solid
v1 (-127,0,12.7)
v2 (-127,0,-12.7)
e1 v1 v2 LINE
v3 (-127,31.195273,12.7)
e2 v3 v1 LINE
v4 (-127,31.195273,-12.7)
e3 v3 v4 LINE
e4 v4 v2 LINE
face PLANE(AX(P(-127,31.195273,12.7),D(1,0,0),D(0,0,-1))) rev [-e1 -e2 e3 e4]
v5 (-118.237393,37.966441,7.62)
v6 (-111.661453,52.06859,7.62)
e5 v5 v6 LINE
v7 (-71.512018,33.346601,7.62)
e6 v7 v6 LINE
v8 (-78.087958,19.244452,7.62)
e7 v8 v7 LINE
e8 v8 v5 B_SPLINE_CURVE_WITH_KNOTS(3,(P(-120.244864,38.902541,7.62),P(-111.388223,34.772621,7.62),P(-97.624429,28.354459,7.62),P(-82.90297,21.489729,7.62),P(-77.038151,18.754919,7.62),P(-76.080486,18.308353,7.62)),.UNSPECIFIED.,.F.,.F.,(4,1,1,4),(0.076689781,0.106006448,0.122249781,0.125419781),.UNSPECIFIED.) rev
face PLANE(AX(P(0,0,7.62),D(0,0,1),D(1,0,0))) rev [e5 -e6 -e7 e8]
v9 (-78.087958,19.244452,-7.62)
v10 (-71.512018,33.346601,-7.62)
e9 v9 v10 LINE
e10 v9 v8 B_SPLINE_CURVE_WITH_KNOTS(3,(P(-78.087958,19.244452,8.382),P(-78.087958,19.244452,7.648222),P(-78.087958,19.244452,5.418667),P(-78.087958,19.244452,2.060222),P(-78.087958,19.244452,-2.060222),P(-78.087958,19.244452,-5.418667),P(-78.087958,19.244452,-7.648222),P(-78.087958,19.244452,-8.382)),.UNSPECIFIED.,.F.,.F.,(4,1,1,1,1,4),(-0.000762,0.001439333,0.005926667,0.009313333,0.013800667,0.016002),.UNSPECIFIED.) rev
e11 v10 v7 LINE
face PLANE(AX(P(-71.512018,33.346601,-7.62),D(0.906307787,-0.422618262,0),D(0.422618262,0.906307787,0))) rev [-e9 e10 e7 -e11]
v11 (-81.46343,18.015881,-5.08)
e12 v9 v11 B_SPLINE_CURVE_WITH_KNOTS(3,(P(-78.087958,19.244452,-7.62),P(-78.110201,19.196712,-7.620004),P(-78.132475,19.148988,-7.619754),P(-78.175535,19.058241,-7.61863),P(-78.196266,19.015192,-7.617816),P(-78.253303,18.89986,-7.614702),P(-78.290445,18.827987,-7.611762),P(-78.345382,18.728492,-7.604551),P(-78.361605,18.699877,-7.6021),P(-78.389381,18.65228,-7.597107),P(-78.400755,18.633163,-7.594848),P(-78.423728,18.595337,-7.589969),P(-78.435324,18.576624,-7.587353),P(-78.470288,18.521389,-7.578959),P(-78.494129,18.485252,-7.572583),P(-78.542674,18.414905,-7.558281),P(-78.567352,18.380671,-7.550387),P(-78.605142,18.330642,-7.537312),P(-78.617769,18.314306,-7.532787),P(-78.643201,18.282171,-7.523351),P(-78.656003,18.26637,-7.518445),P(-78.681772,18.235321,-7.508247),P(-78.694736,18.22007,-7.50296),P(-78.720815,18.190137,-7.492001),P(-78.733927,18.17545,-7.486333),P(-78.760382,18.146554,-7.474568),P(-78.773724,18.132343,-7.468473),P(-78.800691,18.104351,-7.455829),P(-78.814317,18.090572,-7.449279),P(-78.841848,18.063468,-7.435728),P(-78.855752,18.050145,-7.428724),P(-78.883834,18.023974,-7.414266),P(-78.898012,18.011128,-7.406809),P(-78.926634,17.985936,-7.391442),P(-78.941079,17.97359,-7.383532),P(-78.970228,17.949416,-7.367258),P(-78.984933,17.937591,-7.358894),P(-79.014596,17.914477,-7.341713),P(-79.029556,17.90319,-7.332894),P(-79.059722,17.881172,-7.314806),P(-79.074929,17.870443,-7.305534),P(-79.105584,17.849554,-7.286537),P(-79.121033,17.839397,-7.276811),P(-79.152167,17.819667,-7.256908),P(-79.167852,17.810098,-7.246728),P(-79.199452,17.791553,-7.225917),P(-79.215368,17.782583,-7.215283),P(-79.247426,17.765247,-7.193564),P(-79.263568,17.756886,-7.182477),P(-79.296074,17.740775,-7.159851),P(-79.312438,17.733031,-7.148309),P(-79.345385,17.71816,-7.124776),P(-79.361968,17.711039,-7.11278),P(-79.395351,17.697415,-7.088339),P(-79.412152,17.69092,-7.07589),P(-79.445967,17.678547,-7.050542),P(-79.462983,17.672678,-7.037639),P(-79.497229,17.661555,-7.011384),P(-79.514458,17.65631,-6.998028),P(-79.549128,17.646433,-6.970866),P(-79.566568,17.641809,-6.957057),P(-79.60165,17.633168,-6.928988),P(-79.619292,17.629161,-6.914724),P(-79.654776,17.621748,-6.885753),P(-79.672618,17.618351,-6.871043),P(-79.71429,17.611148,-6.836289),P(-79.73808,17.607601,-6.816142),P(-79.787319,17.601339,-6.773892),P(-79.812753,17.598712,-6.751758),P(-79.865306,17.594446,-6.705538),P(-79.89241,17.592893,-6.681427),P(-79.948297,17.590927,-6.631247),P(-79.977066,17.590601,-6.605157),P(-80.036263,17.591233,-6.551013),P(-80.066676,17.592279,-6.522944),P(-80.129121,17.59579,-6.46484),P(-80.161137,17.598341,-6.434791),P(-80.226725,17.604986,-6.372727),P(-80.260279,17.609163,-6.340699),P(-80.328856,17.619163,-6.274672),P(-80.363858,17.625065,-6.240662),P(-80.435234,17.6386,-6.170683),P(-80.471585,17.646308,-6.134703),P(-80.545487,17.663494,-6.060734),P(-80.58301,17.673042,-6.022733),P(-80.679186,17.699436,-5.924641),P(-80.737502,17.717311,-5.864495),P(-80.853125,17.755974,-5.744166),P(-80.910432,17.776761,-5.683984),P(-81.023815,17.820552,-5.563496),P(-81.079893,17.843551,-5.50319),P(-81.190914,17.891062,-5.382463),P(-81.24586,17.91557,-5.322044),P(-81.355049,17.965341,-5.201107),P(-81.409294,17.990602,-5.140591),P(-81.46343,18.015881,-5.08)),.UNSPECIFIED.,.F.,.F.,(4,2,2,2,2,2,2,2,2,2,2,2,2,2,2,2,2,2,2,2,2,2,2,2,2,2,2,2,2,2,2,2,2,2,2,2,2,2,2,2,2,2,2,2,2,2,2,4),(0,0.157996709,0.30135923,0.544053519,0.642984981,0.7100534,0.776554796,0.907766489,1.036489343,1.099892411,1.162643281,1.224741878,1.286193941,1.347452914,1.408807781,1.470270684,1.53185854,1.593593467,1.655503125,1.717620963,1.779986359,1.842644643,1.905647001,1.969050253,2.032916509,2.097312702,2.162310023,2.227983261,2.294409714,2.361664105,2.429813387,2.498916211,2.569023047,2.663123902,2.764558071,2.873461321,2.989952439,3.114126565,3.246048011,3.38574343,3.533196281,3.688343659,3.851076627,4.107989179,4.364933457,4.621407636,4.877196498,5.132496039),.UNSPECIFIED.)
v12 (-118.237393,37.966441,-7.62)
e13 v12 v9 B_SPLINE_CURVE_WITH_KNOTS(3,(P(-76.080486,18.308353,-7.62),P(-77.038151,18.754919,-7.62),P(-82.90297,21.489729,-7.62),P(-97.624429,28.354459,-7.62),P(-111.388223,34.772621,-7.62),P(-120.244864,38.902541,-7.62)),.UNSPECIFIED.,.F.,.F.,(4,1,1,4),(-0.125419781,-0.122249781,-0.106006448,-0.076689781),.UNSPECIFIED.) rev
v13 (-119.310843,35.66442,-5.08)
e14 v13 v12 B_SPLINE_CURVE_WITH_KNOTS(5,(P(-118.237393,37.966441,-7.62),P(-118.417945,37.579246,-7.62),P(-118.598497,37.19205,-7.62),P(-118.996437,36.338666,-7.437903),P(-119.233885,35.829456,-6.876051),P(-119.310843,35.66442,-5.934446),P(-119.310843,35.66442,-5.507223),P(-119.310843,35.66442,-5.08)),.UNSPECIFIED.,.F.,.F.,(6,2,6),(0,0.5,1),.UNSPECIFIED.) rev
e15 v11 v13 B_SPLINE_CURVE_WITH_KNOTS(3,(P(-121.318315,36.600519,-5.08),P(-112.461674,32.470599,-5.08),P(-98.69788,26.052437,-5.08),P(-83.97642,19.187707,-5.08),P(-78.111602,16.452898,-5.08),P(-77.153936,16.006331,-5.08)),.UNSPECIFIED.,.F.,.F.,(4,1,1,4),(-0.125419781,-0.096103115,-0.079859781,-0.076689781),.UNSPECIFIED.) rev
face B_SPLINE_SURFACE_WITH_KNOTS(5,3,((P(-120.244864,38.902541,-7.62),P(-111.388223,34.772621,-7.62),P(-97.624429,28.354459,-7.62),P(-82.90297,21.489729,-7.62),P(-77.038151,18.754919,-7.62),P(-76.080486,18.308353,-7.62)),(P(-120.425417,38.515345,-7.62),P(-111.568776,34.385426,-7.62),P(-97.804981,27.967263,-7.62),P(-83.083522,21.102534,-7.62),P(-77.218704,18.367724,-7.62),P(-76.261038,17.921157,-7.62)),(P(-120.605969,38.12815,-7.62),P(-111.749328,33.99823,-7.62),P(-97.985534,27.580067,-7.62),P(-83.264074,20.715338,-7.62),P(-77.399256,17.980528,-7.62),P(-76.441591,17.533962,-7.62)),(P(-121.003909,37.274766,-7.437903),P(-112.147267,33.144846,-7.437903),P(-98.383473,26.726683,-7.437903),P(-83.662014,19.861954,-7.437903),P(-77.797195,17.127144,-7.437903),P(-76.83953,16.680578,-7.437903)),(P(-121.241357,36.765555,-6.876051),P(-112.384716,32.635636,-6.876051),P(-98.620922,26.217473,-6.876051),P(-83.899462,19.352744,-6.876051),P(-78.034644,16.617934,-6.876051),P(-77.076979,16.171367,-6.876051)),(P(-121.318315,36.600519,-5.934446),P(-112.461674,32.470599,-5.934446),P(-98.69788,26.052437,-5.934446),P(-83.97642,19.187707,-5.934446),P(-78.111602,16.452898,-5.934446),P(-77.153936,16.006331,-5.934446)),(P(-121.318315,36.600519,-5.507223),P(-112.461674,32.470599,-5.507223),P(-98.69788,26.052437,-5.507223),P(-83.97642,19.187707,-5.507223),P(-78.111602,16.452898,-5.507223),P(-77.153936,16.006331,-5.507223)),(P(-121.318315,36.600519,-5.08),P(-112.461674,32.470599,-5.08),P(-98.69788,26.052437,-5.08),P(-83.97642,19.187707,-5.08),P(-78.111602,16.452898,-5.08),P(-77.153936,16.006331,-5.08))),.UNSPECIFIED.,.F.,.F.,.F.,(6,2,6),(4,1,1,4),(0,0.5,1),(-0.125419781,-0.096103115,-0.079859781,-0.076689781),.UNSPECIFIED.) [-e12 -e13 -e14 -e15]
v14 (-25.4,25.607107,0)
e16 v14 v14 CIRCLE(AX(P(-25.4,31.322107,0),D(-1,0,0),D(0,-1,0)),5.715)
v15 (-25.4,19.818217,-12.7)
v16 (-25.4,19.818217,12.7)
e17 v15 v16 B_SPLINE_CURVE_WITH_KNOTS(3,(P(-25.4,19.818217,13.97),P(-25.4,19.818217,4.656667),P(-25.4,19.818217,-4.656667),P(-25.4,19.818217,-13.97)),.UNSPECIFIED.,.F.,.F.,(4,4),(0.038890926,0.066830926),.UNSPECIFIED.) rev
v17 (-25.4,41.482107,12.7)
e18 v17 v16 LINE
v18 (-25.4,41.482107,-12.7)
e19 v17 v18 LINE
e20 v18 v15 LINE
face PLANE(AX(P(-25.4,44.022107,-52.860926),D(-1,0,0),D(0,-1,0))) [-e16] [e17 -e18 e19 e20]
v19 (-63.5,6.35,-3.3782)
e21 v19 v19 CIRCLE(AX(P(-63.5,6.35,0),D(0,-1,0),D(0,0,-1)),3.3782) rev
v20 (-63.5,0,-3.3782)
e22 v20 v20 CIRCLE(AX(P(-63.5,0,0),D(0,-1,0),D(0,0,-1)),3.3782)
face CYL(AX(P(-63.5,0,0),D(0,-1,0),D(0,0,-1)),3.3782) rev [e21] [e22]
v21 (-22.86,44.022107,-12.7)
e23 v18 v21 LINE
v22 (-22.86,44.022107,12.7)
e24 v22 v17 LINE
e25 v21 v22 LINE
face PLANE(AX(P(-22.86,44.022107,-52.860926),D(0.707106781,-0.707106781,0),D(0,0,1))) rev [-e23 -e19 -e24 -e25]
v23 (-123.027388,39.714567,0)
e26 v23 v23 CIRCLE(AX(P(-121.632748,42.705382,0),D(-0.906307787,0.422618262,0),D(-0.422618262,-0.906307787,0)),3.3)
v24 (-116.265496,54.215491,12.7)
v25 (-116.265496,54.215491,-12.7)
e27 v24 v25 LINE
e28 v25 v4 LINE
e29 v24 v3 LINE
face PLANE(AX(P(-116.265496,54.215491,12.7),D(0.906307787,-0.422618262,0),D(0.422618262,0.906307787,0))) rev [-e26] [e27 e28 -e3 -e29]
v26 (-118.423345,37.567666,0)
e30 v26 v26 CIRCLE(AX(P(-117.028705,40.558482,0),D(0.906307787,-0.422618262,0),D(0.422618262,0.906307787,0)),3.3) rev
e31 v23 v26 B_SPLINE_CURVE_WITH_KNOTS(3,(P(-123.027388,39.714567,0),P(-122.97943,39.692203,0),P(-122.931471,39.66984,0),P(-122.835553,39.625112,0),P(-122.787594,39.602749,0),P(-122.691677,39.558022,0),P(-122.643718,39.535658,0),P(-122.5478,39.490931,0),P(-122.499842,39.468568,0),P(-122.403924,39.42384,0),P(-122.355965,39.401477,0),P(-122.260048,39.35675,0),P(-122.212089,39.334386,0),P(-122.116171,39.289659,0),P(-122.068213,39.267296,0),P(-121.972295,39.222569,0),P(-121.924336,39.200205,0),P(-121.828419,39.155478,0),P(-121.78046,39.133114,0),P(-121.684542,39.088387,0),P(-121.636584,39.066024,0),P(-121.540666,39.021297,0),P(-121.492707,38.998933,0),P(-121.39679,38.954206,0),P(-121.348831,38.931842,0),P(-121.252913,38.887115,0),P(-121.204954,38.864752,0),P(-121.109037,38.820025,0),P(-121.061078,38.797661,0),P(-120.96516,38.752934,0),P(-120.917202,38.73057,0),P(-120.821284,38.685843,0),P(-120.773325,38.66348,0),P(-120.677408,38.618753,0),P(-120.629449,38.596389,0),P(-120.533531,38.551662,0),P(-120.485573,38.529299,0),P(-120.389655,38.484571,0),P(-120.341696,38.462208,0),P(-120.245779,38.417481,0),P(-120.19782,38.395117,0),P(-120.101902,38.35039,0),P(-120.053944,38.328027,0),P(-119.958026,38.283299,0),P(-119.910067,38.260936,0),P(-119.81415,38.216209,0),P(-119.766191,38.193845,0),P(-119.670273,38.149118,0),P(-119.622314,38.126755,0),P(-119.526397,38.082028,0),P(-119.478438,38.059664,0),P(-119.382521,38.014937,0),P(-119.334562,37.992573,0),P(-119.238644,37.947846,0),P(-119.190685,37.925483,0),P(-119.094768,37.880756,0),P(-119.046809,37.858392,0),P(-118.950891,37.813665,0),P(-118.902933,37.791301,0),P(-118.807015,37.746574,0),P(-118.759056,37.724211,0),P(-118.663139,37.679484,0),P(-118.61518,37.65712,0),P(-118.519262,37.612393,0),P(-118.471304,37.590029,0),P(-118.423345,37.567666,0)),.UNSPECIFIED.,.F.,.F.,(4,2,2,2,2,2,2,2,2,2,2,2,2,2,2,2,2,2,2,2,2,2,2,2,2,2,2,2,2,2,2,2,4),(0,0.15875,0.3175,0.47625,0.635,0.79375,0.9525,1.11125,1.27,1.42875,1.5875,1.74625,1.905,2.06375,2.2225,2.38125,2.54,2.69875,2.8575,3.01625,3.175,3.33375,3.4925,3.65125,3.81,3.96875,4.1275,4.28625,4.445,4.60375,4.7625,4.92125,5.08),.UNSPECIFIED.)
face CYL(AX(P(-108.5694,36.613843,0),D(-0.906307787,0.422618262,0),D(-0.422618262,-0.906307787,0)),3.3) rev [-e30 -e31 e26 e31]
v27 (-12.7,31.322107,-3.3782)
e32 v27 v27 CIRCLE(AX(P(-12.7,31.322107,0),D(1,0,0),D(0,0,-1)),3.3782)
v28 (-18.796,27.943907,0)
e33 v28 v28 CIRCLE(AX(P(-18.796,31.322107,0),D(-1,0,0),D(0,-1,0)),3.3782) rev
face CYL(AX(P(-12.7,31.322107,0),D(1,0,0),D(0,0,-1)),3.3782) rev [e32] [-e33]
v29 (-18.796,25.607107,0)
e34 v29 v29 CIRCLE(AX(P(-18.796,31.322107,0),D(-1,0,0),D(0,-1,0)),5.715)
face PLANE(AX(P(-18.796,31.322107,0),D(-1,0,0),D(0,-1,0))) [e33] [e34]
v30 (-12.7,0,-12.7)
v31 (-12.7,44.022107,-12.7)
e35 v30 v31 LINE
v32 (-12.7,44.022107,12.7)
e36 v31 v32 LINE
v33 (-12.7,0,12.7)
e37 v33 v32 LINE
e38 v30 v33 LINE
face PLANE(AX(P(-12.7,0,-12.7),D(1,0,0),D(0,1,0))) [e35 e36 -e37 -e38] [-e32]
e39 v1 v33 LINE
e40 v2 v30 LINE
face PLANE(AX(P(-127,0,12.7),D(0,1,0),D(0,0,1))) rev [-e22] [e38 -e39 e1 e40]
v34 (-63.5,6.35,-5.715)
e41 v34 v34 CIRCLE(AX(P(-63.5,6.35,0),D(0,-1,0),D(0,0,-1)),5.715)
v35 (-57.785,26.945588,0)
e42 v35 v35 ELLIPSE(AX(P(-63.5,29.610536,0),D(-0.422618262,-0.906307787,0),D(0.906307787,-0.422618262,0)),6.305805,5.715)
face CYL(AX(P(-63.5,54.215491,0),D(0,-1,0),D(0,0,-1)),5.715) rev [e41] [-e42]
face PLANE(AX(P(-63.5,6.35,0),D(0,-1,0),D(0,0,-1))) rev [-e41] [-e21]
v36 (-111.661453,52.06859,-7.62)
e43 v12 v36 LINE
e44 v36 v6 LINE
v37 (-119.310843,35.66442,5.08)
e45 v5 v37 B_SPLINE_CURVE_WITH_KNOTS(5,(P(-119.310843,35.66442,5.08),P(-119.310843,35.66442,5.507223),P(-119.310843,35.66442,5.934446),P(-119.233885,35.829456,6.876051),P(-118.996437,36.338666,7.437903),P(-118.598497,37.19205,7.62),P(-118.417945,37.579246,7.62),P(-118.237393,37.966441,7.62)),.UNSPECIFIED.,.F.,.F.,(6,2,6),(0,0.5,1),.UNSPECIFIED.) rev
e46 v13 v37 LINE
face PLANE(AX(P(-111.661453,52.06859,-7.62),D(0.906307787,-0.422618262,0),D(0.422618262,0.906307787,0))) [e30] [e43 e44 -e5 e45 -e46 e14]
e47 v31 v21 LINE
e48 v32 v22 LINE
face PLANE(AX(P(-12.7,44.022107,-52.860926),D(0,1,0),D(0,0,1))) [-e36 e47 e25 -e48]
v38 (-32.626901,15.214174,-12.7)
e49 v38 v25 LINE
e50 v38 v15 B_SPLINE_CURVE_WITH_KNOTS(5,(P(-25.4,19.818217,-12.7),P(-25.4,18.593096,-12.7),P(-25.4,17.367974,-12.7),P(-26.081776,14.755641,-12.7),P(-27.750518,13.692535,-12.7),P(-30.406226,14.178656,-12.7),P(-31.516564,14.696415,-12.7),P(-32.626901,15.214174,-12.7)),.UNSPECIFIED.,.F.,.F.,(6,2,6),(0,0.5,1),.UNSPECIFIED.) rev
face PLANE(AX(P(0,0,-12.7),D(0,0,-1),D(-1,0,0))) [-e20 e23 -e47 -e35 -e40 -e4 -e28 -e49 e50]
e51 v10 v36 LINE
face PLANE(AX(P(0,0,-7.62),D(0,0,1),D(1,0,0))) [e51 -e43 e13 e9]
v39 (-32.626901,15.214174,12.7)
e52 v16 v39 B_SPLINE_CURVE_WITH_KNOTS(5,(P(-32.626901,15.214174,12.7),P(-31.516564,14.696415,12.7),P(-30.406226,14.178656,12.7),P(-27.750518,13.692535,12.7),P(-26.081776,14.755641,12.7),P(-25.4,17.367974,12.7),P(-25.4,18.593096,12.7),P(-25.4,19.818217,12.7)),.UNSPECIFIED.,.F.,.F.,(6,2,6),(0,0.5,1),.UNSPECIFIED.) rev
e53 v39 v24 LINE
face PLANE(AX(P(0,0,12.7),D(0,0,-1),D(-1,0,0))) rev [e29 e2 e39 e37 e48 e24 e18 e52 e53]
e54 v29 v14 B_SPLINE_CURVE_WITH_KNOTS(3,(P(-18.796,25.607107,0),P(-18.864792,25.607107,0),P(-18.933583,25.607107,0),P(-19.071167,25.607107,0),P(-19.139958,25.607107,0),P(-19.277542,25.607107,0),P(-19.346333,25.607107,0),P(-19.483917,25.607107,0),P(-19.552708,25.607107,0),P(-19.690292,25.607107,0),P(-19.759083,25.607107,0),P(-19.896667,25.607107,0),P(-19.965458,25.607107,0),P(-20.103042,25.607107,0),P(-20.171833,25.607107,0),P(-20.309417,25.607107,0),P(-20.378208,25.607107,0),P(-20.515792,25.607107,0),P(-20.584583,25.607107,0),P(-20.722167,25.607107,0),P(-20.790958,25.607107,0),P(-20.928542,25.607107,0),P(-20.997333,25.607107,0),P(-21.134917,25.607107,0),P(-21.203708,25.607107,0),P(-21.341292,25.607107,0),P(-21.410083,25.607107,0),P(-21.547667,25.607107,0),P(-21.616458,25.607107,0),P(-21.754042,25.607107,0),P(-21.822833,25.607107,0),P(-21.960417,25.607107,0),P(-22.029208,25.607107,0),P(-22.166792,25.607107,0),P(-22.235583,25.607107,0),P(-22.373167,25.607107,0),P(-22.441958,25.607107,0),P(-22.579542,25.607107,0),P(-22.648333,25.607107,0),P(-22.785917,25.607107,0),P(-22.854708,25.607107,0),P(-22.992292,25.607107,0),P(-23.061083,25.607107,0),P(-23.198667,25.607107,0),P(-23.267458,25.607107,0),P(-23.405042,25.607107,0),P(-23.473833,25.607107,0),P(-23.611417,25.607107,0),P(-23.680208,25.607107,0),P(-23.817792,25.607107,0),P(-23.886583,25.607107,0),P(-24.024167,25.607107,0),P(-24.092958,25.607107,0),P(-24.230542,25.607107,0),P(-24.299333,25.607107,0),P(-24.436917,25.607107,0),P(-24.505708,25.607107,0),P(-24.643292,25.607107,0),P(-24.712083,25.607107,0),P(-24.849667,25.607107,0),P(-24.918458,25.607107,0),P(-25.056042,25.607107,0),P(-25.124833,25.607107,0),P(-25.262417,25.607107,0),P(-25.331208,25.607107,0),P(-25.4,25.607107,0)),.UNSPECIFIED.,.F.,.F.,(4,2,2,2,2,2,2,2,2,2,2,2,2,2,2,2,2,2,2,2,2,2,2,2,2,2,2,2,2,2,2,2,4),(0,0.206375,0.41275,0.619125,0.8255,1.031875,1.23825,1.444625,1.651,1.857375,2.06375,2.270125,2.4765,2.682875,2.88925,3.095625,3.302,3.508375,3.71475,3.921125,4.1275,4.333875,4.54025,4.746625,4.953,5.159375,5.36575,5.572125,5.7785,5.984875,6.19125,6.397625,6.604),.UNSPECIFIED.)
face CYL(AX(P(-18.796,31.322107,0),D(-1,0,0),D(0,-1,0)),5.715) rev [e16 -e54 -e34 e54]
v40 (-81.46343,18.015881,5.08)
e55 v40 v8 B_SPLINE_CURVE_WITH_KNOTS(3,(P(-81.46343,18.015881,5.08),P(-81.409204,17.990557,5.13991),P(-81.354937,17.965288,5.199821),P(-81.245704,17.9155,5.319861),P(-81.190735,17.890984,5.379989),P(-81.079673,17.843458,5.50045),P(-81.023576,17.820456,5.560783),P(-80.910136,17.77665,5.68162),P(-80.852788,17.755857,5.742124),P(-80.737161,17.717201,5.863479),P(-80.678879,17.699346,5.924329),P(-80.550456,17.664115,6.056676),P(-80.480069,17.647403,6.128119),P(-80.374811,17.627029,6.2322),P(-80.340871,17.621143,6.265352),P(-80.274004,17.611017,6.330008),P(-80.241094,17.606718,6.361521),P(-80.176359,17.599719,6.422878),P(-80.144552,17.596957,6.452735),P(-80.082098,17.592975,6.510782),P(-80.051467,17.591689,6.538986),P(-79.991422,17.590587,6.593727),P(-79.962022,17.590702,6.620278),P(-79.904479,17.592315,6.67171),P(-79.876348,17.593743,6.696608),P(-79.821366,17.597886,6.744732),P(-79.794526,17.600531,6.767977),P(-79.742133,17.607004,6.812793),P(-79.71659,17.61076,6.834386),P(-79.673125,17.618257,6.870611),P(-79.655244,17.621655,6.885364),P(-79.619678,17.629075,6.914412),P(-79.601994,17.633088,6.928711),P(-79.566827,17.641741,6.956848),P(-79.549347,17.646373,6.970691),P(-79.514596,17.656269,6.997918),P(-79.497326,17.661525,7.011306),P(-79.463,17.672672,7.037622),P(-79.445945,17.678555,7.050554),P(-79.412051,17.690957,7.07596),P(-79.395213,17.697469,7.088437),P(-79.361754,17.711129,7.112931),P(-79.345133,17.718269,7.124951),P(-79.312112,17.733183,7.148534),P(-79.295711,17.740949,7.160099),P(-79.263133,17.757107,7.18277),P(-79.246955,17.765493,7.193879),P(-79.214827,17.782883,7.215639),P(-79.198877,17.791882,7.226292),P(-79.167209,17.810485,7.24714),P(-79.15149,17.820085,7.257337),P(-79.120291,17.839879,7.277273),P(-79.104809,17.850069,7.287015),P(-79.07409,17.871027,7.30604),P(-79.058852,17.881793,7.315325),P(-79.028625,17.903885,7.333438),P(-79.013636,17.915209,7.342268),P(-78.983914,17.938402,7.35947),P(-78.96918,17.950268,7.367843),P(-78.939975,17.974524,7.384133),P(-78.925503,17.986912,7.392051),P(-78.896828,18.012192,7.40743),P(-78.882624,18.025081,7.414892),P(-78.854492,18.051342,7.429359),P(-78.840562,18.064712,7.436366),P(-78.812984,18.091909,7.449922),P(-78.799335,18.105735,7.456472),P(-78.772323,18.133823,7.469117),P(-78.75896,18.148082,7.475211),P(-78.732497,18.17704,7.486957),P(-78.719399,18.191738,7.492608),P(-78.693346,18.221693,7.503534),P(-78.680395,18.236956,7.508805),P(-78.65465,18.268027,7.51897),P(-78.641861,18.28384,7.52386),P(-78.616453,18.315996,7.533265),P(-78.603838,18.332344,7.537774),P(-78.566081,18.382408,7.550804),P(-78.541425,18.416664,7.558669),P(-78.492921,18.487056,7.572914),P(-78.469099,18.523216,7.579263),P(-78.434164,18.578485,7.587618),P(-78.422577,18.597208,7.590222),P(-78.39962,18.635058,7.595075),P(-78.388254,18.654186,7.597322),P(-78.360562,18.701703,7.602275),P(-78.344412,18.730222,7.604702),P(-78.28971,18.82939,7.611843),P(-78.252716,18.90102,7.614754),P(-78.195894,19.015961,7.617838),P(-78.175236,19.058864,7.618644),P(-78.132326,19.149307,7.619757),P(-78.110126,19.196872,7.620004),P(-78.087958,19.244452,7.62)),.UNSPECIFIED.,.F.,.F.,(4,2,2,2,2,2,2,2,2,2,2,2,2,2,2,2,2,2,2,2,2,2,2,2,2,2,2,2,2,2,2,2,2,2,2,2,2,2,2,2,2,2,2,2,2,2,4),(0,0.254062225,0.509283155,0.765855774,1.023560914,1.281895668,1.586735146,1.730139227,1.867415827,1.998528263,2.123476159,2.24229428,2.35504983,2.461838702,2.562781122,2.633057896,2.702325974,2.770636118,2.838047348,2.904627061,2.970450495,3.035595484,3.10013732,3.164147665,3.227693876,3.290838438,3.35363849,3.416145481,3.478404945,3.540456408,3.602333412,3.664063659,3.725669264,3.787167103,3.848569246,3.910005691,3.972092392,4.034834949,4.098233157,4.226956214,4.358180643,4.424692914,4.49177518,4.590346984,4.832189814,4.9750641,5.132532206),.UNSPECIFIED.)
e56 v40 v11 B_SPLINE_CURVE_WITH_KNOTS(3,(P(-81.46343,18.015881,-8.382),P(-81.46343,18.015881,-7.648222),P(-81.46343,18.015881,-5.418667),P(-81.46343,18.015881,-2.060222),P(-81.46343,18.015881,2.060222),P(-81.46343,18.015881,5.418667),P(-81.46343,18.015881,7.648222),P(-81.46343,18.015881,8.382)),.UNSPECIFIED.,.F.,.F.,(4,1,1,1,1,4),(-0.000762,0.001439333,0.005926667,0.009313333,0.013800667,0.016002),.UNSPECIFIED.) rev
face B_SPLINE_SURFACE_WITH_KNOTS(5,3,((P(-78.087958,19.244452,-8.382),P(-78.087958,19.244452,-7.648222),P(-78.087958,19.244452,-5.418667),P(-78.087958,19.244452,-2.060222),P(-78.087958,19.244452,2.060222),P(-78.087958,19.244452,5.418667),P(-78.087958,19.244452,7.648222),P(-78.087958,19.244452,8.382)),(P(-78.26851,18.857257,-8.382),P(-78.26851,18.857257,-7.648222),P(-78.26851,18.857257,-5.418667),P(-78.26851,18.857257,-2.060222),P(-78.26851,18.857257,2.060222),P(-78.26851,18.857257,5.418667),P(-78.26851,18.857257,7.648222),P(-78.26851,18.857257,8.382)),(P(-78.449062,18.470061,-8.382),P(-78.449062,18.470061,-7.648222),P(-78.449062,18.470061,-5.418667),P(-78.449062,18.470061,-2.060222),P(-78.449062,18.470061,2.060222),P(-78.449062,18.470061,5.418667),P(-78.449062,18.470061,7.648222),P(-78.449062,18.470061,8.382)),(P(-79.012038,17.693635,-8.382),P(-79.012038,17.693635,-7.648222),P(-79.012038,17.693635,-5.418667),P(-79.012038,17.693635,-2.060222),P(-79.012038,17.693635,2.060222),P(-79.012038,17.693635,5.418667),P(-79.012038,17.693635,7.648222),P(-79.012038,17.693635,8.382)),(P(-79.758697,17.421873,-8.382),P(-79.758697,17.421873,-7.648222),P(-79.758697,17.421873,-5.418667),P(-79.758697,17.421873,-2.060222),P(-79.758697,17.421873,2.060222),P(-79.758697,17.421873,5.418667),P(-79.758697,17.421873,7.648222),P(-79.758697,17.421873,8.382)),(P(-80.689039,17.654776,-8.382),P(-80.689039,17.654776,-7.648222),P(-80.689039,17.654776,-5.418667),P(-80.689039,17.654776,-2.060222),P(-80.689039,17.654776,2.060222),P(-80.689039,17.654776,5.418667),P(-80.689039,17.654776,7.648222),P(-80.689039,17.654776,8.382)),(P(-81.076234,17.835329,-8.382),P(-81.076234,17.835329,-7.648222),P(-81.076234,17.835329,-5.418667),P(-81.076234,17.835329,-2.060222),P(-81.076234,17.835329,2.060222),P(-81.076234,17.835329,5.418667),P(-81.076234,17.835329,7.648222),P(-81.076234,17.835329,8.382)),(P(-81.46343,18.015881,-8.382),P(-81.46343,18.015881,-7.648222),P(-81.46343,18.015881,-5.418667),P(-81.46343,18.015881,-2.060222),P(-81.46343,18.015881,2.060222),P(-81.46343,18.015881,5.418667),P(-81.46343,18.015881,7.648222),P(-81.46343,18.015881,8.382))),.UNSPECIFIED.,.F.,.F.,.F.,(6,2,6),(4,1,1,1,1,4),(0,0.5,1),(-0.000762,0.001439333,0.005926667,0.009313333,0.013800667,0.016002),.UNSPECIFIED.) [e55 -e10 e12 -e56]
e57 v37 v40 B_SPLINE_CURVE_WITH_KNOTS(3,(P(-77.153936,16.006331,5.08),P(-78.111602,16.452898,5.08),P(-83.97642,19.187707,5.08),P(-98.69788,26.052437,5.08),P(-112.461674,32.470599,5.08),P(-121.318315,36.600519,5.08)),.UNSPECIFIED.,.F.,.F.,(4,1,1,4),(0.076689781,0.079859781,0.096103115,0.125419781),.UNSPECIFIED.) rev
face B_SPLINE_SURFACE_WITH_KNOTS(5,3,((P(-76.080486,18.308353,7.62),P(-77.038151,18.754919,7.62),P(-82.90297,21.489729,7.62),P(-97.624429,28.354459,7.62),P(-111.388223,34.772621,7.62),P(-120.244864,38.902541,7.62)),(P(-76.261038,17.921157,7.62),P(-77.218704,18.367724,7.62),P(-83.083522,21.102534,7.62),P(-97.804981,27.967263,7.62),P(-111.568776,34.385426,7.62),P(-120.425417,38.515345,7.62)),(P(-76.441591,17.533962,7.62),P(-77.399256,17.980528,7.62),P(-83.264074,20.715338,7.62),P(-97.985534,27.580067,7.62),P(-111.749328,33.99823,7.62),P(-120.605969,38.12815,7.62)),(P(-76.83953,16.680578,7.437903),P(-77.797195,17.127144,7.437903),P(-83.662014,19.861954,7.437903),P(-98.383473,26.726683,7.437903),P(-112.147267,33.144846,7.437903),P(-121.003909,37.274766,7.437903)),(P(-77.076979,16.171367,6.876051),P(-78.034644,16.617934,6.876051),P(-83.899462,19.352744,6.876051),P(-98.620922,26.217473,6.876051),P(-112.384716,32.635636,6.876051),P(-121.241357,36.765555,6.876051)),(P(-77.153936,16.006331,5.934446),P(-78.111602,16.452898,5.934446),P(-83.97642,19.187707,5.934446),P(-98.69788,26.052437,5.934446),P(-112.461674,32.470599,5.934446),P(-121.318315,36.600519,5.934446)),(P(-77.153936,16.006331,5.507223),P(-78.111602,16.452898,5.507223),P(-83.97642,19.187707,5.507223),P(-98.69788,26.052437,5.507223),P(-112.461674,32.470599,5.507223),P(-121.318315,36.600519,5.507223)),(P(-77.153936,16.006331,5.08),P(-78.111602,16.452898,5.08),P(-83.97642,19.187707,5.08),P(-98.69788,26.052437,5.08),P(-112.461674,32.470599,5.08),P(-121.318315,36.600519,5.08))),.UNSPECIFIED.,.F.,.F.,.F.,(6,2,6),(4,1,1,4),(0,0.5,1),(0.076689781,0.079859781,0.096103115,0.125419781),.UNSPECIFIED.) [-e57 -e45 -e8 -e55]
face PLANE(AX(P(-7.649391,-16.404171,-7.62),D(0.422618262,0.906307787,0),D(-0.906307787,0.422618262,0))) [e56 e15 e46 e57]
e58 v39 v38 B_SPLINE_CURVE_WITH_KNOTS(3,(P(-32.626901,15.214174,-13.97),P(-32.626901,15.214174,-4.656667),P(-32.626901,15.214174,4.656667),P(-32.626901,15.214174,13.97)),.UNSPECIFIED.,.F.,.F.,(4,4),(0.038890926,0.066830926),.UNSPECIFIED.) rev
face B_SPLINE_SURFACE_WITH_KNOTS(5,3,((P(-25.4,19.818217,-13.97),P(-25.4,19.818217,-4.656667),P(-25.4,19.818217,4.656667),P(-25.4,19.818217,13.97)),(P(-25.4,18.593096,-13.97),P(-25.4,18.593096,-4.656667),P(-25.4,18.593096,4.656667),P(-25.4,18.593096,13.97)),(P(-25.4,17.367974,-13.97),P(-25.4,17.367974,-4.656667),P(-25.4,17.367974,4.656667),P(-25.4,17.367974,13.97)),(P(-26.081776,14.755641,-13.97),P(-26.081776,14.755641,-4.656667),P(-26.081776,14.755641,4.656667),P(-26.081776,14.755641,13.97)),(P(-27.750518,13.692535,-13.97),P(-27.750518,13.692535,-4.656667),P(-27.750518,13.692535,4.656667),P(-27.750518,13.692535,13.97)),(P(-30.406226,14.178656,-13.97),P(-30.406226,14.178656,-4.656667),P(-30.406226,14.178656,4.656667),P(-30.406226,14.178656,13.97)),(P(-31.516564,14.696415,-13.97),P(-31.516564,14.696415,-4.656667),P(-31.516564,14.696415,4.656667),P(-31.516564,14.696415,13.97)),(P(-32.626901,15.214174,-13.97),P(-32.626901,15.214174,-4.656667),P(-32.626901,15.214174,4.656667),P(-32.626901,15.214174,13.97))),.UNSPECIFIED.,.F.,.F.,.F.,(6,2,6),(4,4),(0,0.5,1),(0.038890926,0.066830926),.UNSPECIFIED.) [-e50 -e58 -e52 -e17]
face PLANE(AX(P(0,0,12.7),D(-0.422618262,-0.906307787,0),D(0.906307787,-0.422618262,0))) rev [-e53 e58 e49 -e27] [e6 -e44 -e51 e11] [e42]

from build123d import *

# Parameters (mm, degrees)
BOSS_EXTRUDE2_DEPTH         = 12.7
CUT_EXTRUDE1_DEPTH          = 7.62
SKETCH3_R                   = 3.3
CUT_EXTRUDE3_DEPTH          = 5.08
FILLET1_START               = -124
FILLET1_DEPTH               = 45.095218809
FILLET1_START_2             = -7.62
FILLET1_2_DEPTH             = 16.62
FILLET1_3_DEPTH             = 46
F_1_4_CLEARANCE_HOLE1_D     = 6.7564
SKETCH8_R                   = 5.715
CUT_EXTRUDE4_DEPTH          = 137.313591586
CUT_EXTRUDE5_DEPTH          = 141.404698959
BOSS_EXTRUDE3_DEPTH         = 25.4
F_1_4_CLEARANCE_HOLE2_D     = 6.7564
F_1_4_CLEARANCE_HOLE2_DEPTH = 12.7
F_1_4_CLEARANCE_HOLE2_TIP   = 2.029827343
SKETCH14_R                  = 5.715
CUT_EXTRUDE6_DEPTH          = 6.604
CHAMFER1_SIZE               = 2.54


with BuildPart() as part:
    # Sketch1 → Boss-Extrude2 (new, symmetric)
    with BuildSketch(Plane.XY):
        Polygon((-127, 31.195273444), (-127, 0), (0, 0), (-116.265496152, 54.215491235), align=None)
    extrude(amount=BOSS_EXTRUDE2_DEPTH, both=True)

    # Sketch2 → Cut-Extrude1 (cut, symmetric)
    with BuildSketch(Plane.XY):
        Polygon((-115.634064254, 43.549297267), (-114.746565904, 45.45254362), (-109.127457625, 42.832310397), (-113.691734852, 33.044186297), (-119.310843131, 35.66441952), (-118.423344781, 37.567665873), align=None)
        Polygon((-71.512017628, 33.34660147), (-111.661452594, 52.068590465), (-114.746565904, 45.45254362), (-109.127457625, 42.832310397), (-113.691734852, 33.044186297), (-79.161408165, 16.942430525), align=None)
    extrude(amount=CUT_EXTRUDE1_DEPTH, both=True, mode=Mode.SUBTRACT)

    # Sketch3 → Cut-Extrude3 (cut)
    with BuildSketch(Plane(origin=(-116.265496152, 54.215491235, 0), x_dir=(0, 0, 1), z_dir=(-0.9063077870366528, 0.42261826174069317, 0))):
        with Locations(Location((0, -12.7, 0), (0, 0, 270))):
            Circle(SKETCH3_R)
    extrude(amount=-CUT_EXTRUDE3_DEPTH, mode=Mode.SUBTRACT)


with BuildPart() as fillet1_tool:
    # Fillet1: read off the stored shape, not the designer's step
    # Fillet1 outline → Fillet1 (new body)
    with BuildSketch(Plane(origin=(0, 0, 0), x_dir=(0.42261826174025074, 0.9063077870368592, -5.451523076012236e-13), z_dir=(0.9063077870368591, -0.42261826174025074, -1.1690828963840908e-12)).offset(FILLET1_START)):
        with BuildLine():
            Line((-18.1, 7.62), (-18.1, 5.08))
            add(Edge.make_bspline(
                [(-15.56, 7.62), (-15.987223051, 7.62), (-16.414446102, 7.62), (-17.356051224, 7.437902524), (-17.917902524, 6.876051224), (-18.1, 5.934446102), (-18.1, 5.507223051), (-18.1, 5.08)],
                knots=[0, 0, 0, 0, 0, 0, 0.5, 0.5, 1, 1, 1, 1, 1, 1], degree=5))
            Line((-15.56, 7.62), (-18.1, 7.62))
        make_face()
    extrude(amount=FILLET1_DEPTH)


with BuildPart() as part_1:
    add(part.part)


with BuildPart() as part_2:
    # Fillet1: joined with fillet1_tool
    add(part_1.part.fuse(fillet1_tool.part, tol=0.00001))


with BuildPart() as fillet1_2_tool:
    # Fillet1 2 outline → Fillet1 2 (new body)
    with BuildSketch(Plane.XY.offset(FILLET1_START_2)):
        with BuildLine():
            Line((-79.161408165, 16.942430525), (-78.087957781, 19.244452304))
            add(Edge.make_bspline(
                [(-78.087957781, 19.244452304), (-78.268510044, 18.857256726), (-78.449062307, 18.470061148), (-79.012038188, 17.693634812), (-79.758697015, 17.421873224), (-80.689038789, 17.654776383), (-81.076234367, 17.835328646), (-81.463429944, 18.015880909)],
                knots=[0, 0, 0, 0, 0, 0, 0.5, 0.5, 1, 1, 1, 1, 1, 1], degree=5))
            Line((-81.463429944, 18.015880909), (-79.161408165, 16.942430525))
        make_face()
    extrude(amount=FILLET1_2_DEPTH)


with BuildPart() as part_3:
    add(part_2.part)


with BuildPart() as part_4:
    # Fillet1 2: joined with fillet1_2_tool
    add(part_3.part.fuse(fillet1_2_tool.part, tol=0.00001))


with BuildPart() as fillet1_3_tool:
    # Fillet1 3 outline → Fillet1 3 (new body)
    with BuildSketch(Plane(origin=(0, 0, 0), x_dir=(0.42261826174025074, 0.9063077870368592, -5.451523076012236e-13), z_dir=(0.9063077870368591, -0.42261826174025074, -1.1690828963840908e-12)).offset(FILLET1_START)):
        with BuildLine():
            Line((-14, -7.62), (-15.56, -7.62))
            add(Edge.make_bspline(
                [(-15.56, -7.62), (-15.987223051, -7.62), (-16.414446102, -7.62), (-17.356051224, -7.437902524), (-17.917902524, -6.876051224), (-18.1, -5.934446102), (-18.1, -5.507223051), (-18.1, -5.08)],
                knots=[0, 0, 0, 0, 0, 0, 0.5, 0.5, 1, 1, 1, 1, 1, 1], degree=5))
            Line((-18.1, -5.08), (-18.1, -4))
            Line((-18.1, -4), (-20, -4))
            Line((-20, -4), (-20, -9))
            Line((-20, -9), (-14, -9))
            Line((-14, -9), (-14, -7.62))
        make_face()
    extrude(amount=FILLET1_3_DEPTH)


with BuildPart() as part_5:
    add(part_4.part)


with BuildPart() as part_6:
    # Fillet1 3: joined with fillet1_3_tool
    add(part_5.part.fuse(fillet1_3_tool.part, tol=0.00001))

    # 1/4 Clearance Hole1 (through all)
    with Locations(Plane(origin=(0, 0, 0), x_dir=(-1, 0, 0), z_dir=(0, -1, 0))):
        with Locations((63.5, 0)):
            Hole(F_1_4_CLEARANCE_HOLE1_D / 2)

    # Sketch8 → Cut-Extrude4 (cut, through all)
    with BuildSketch(Plane(origin=(0, 6.35, 0), x_dir=(-1, 0, 0), z_dir=(0, -1, 0))):
        with Locations(Location((63.5, 0, 0), (0, 0, 90))):
            Circle(SKETCH8_R)
    extrude(amount=-CUT_EXTRUDE4_DEPTH, mode=Mode.SUBTRACT)

    # Sketch9 → Cut-Extrude5 (cut, through all)
    with BuildSketch(Plane.XY.offset(12.7)):
        Polygon((-12.7, 5.922107259), (-12.7, 0), (0, 0), align=None)
    extrude(amount=-CUT_EXTRUDE5_DEPTH, mode=Mode.SUBTRACT)

    # Sketch10 → Boss-Extrude3 (add)
    with BuildSketch(Plane.XY.offset(12.7)):
        Polygon((-12.7, 5.922107259), (-12.7, 44.022107259), (-25.4, 44.022107259), (-25.4, 11.844214517), align=None)
    extrude(amount=-BOSS_EXTRUDE3_DEPTH)

    # 1/4 Clearance Hole2
    with Locations(Plane(origin=(-12.7, 0, 0), x_dir=(0, 0, -1), z_dir=(1, 0, 0))):
        with Locations((0, 31.322107259)):
            Hole(F_1_4_CLEARANCE_HOLE2_D / 2, depth=F_1_4_CLEARANCE_HOLE2_DEPTH)
            with Locations((0, 0, -(F_1_4_CLEARANCE_HOLE2_DEPTH + F_1_4_CLEARANCE_HOLE2_TIP / 2))):  # 118° drill point
                Cone(0, F_1_4_CLEARANCE_HOLE2_D / 2, F_1_4_CLEARANCE_HOLE2_TIP, mode=Mode.SUBTRACT)

    # Sketch14 → Cut-Extrude6 (cut)
    with BuildSketch(Plane.ZY.offset(25.4)):
        with Locations(Location((0, 31.322107259, 0), (0, 0, 270))):
            Circle(SKETCH14_R)
    extrude(amount=-CUT_EXTRUDE6_DEPTH, mode=Mode.SUBTRACT)

    # Chamfer1
    chamfer1_edges = [part_6.edges().sort_by_distance(p)[0] for p in [
        (-25.4, 44.022107259, 0),
    ]]
    chamfer(chamfer1_edges, length=CHAMFER1_SIZE)

    # Fillet2
    # a fillet whose section is not a circle: 5.08 mm, written as the material it adds along each edge (its section moved 0.00015 mm through the faces so that the kernel can cut it)
    with BuildSketch(Plane(origin=(-25.4, 11.844214517, 12.7), x_dir=(1.881112974510357e-05, 0.9999999998230706, 0), z_dir=(0, 0, -1))) as fillet2_piece_1:
        with BuildLine():
            add(Edge.make_bspline([(7.974002733, 0), (6.748845081, 2.3047e-05), (5.523687428, 4.6093e-05), (2.911264627, -0.681700719), (1.848095837, -2.35047216), (2.334181059, -5.00626823), (2.851934169, -6.11664789), (3.369687279, -7.227027551)], knots=[0, 0, 0, 0, 0, 0, 0.5, 0.5, 1, 1, 1, 1, 1, 1], degree=5))
            Line((3.369687279, -7.227027551), (3.277605601, -7.269963835))
            ThreePointArc((3.277605601, -7.269963835), (1.592829935, -3.656418364), (-0.092081679, -0.042936283))
            Line((-0.092081679, -0.042936283), (1.911e-06, 0.1016))
            ThreePointArc((1.911e-06, 0.1016), (3.987003276, 0.101525), (7.974004644, 0.1016))
            Line((7.974004644, 0.1016), (7.974002733, 0))
        make_face()
    extrude(amount=25.4)


solid = part_6.part
